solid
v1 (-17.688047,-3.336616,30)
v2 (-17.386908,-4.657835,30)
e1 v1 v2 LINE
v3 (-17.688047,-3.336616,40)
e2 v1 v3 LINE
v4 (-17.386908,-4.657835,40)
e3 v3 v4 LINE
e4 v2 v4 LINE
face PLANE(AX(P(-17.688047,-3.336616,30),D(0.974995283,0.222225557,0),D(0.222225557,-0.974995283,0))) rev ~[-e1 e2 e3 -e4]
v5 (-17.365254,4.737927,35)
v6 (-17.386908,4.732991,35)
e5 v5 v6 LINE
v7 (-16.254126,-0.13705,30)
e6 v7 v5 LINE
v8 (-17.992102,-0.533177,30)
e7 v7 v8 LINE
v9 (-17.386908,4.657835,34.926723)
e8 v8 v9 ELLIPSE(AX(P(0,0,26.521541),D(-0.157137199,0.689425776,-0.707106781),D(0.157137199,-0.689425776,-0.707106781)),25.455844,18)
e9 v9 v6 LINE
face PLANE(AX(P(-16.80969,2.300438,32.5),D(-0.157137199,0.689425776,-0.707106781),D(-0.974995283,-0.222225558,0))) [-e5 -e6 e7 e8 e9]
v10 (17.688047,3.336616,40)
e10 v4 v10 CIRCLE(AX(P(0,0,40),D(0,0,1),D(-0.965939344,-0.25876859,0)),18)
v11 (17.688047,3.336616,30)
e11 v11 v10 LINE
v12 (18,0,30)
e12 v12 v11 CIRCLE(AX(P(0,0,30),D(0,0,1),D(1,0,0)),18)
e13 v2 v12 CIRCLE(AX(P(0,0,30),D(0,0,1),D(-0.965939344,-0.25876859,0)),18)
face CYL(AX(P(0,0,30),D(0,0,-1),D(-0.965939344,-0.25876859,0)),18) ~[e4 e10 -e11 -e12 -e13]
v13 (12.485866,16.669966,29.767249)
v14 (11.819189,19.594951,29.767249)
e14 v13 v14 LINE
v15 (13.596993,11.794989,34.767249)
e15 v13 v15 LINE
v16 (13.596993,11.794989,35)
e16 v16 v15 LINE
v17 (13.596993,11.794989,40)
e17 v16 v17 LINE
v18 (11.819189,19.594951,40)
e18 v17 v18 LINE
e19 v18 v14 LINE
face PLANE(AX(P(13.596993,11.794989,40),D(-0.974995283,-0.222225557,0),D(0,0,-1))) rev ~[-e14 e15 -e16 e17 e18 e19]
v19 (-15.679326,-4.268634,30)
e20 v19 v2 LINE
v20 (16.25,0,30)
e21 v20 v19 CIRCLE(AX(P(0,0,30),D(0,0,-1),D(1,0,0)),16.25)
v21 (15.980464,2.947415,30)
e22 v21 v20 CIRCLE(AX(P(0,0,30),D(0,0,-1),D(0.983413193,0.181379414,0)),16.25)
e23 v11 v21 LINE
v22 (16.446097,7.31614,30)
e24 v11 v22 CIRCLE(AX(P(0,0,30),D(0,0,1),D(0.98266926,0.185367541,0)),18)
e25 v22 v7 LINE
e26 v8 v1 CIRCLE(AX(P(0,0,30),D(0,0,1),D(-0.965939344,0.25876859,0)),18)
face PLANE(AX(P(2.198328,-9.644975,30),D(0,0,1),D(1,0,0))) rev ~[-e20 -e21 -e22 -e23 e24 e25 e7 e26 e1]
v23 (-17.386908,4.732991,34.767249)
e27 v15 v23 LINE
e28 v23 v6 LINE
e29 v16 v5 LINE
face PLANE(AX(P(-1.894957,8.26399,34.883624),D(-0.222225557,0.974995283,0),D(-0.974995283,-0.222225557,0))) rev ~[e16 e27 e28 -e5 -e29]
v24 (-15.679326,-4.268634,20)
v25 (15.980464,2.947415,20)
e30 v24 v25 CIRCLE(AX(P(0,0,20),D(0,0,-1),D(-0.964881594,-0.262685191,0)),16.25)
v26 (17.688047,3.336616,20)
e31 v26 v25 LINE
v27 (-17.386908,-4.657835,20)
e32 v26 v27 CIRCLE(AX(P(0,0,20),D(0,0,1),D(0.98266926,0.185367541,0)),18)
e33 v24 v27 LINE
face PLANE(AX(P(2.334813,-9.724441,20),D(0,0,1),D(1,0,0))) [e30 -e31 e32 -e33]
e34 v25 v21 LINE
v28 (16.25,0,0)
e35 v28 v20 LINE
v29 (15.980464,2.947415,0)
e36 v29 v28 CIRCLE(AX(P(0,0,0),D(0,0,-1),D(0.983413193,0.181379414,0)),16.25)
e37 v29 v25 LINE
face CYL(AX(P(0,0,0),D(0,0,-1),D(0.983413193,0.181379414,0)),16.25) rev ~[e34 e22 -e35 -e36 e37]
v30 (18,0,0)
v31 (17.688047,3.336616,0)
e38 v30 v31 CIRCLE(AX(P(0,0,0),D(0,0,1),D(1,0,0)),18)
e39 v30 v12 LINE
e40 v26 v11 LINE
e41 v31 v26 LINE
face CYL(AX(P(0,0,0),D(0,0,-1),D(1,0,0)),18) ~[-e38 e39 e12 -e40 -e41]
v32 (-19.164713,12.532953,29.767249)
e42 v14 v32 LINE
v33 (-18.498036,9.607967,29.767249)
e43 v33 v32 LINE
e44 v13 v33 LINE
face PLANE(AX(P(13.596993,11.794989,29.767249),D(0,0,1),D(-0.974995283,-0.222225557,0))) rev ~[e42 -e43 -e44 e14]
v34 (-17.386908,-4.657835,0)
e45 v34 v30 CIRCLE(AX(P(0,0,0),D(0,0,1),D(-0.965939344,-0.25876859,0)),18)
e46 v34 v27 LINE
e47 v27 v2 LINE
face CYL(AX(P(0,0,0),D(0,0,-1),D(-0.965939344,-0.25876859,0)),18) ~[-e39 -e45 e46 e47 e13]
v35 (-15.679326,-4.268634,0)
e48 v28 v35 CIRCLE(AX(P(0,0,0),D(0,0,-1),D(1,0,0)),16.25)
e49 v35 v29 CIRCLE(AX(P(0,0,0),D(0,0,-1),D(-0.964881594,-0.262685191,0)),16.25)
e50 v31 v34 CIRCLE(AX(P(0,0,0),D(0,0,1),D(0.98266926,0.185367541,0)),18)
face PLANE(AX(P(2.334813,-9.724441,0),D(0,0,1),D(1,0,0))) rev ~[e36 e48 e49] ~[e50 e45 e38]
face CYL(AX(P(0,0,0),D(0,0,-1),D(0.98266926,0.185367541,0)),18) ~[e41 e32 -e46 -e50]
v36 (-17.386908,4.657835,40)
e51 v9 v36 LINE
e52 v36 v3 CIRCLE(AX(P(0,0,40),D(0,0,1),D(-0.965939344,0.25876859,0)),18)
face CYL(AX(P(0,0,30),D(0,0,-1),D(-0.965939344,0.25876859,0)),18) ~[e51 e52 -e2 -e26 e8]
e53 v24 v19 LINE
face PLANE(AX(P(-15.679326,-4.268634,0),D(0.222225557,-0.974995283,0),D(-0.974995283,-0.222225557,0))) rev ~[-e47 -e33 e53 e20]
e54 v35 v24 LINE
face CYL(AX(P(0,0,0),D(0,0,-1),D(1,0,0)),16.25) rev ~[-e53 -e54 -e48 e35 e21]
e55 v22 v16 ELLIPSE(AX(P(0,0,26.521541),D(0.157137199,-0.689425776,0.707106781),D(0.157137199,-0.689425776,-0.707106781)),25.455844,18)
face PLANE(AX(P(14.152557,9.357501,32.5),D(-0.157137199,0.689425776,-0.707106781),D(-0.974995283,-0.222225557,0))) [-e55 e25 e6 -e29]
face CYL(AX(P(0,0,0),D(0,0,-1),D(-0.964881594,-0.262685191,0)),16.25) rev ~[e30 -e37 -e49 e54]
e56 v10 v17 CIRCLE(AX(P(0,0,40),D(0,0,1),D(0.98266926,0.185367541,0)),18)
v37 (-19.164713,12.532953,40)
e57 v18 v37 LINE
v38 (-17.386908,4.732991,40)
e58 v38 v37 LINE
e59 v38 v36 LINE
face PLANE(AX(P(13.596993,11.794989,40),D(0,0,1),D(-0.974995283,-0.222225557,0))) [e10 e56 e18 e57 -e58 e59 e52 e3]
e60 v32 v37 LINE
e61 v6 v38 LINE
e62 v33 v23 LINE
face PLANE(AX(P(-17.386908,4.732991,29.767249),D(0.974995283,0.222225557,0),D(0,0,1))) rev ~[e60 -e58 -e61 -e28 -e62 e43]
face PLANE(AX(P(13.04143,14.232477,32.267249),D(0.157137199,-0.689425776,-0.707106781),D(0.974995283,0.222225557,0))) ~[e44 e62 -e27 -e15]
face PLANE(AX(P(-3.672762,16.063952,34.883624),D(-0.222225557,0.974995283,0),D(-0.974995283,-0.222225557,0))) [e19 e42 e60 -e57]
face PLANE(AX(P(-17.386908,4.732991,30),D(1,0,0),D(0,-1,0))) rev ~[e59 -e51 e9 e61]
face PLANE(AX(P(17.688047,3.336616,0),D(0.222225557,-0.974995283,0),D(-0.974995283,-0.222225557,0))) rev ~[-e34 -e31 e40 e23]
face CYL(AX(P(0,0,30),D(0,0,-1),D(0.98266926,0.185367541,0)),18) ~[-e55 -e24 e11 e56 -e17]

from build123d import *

# Parameters (mm, degrees)
F1_DEPTH = 30
F2_DEPTH = 20
F4_DEPTH = 10
F5_SIZE  = 5
F6_W     = 31.7785144259
F6_H     = 10.2327512205
F6_H_2   = 5
F7_DEPTH = 8
F8_SIZE  = 5


with BuildPart() as f1:
    # F0 (on Top) → F1 (new body)
    with BuildSketch(Plane.XY):
        with BuildLine():
            ThreePointArc((15.9804643873, 2.9474154722), (16.182475804, 1.4798570381), (16.25, 0))
            ThreePointArc((16.25, 0), (2.1533060737, -16.1066996294), (-15.6793259019, -4.2686343556))
            Line((-15.6793259019, -4.2686343556), (-17.3869081956, -4.6578346252))
            ThreePointArc((-17.3869081956, -4.6578346252), (2.3490053723, -17.8460688601), (18, 0))
            ThreePointArc((18, 0), (17.9218419848, 1.6755834418), (17.6880466811, 3.3366157419))
            Line((17.6880466811, 3.3366157419), (15.9804643873, 2.9474154722))
        make_face()
    extrude(amount=F1_DEPTH)

    # F0 (on Top) → F2 (join)
    with BuildSketch(Plane.XY):
        with BuildLine():
            ThreePointArc((15.9804643873, 2.9474154722), (16.182475804, 1.4798570381), (16.25, 0))
            ThreePointArc((16.25, 0), (2.1533060737, -16.1066996294), (-15.6793259019, -4.2686343556))
            Line((-15.6793259019, -4.2686343556), (-17.3869081956, -4.6578346252))
            ThreePointArc((-17.3869081956, -4.6578346252), (2.3490053723, -17.8460688601), (18, 0))
            ThreePointArc((18, 0), (17.9218419848, 1.6755834418), (17.6880466811, 3.3366157419))
            Line((17.6880466811, 3.3366157419), (15.9804643873, 2.9474154722))
        make_face()
        with BuildLine():
            ThreePointArc((-15.6793259019, -4.2686343556), (-3.6111653073, 15.8436733469), (15.9804643873, 2.9474154722))
            Line((15.9804643873, 2.9474154722), (17.6880466811, 3.3366157419))
            ThreePointArc((17.6880466811, 3.3366157419), (-4.0000600327, 17.549915092), (-17.3869081956, -4.6578346252))
            Line((-17.3869081956, -4.6578346252), (-15.6793259019, -4.2686343556))
        make_face()
    extrude(amount=F2_DEPTH)

    # F3 (on face) → F4 (join)
    with BuildSketch(Plane.XY.offset(30)):
        with BuildLine():
            ThreePointArc((15.9804643873, 2.9474154722), (3.6111653073, -15.8436733469), (-15.6793259019, -4.2686343556))
            Line((-15.6793259019, -4.2686343556), (-17.3869081956, -4.6578346252))
            ThreePointArc((-17.3869081956, -4.6578346252), (4.0000600327, -17.549915092), (17.6880466811, 3.3366157419))
            Line((17.6880466811, 3.3366157419), (15.9804643873, 2.9474154722))
        make_face()
        with BuildLine():
            Line((-17.3869081956, -4.6578346252), (-15.6793259019, -4.2686343556))
            ThreePointArc((-15.6793259019, -4.2686343556), (3.6111653073, -15.8436733469), (15.9804643873, 2.9474154722))
            Line((15.9804643873, 2.9474154722), (17.6880466811, 3.3366157419))
            ThreePointArc((17.6880466811, 3.3366157419), (16.2041492949, 7.8374450957), (13.5969934668, 11.7949891337))
            Line((13.5969934668, 11.7949891337), (-17.3652541608, 4.7379265435))
            ThreePointArc((-17.3652541608, 4.7379265435), (-17.3761273243, 4.6978930607), (-17.3869081956, 4.6578346252))
            ThreePointArc((-17.3869081956, 4.6578346252), (-17.9872433705, 0.6775514234), (-17.6880466811, -3.3366157419))
            Line((-17.6880466811, -3.3366157419), (-17.3869081956, -4.6578346252))
        make_face()
        with BuildLine():
            Line((-17.3869081956, 4.732991053), (-17.3869081956, 4.6578346252))
            ThreePointArc((-17.3869081956, 4.6578346252), (-17.3761273243, 4.6978930607), (-17.3652541608, 4.7379265435))
            Line((-17.3652541608, 4.7379265435), (-17.3869081956, 4.732991053))
        make_face()
    extrude(amount=F4_DEPTH)

    # F5
    f5_edges = [f1.edges().sort_by_distance(p)[0] for p in [
        (-1.894957, 8.26399, 30),
    ]]
    chamfer(f5_edges, length=F5_SIZE)

    # F6 (on face) → F7 (join)
    with BuildSketch(Plane(origin=(-1.884130347, 8.2664578386, 0), x_dir=(-0.9749952829, -0.2222255574, 0), z_dir=(-0.2222255574, 0.9749952829, 0))):
        with Locations((0.011104687, 34.8836243898)):
            Rectangle(F6_W, F6_H)
        with Locations((0.011104687, 37.5)):
            Rectangle(F6_W, F6_H_2)
    extrude(amount=F7_DEPTH)

    # F8
    f8_edges = [f1.edges().sort_by_distance(p)[0] for p in [
        (-1.894957, 8.26399, 29.767249),
    ]]
    chamfer(f8_edges, length=F8_SIZE)


solid = f1.part
